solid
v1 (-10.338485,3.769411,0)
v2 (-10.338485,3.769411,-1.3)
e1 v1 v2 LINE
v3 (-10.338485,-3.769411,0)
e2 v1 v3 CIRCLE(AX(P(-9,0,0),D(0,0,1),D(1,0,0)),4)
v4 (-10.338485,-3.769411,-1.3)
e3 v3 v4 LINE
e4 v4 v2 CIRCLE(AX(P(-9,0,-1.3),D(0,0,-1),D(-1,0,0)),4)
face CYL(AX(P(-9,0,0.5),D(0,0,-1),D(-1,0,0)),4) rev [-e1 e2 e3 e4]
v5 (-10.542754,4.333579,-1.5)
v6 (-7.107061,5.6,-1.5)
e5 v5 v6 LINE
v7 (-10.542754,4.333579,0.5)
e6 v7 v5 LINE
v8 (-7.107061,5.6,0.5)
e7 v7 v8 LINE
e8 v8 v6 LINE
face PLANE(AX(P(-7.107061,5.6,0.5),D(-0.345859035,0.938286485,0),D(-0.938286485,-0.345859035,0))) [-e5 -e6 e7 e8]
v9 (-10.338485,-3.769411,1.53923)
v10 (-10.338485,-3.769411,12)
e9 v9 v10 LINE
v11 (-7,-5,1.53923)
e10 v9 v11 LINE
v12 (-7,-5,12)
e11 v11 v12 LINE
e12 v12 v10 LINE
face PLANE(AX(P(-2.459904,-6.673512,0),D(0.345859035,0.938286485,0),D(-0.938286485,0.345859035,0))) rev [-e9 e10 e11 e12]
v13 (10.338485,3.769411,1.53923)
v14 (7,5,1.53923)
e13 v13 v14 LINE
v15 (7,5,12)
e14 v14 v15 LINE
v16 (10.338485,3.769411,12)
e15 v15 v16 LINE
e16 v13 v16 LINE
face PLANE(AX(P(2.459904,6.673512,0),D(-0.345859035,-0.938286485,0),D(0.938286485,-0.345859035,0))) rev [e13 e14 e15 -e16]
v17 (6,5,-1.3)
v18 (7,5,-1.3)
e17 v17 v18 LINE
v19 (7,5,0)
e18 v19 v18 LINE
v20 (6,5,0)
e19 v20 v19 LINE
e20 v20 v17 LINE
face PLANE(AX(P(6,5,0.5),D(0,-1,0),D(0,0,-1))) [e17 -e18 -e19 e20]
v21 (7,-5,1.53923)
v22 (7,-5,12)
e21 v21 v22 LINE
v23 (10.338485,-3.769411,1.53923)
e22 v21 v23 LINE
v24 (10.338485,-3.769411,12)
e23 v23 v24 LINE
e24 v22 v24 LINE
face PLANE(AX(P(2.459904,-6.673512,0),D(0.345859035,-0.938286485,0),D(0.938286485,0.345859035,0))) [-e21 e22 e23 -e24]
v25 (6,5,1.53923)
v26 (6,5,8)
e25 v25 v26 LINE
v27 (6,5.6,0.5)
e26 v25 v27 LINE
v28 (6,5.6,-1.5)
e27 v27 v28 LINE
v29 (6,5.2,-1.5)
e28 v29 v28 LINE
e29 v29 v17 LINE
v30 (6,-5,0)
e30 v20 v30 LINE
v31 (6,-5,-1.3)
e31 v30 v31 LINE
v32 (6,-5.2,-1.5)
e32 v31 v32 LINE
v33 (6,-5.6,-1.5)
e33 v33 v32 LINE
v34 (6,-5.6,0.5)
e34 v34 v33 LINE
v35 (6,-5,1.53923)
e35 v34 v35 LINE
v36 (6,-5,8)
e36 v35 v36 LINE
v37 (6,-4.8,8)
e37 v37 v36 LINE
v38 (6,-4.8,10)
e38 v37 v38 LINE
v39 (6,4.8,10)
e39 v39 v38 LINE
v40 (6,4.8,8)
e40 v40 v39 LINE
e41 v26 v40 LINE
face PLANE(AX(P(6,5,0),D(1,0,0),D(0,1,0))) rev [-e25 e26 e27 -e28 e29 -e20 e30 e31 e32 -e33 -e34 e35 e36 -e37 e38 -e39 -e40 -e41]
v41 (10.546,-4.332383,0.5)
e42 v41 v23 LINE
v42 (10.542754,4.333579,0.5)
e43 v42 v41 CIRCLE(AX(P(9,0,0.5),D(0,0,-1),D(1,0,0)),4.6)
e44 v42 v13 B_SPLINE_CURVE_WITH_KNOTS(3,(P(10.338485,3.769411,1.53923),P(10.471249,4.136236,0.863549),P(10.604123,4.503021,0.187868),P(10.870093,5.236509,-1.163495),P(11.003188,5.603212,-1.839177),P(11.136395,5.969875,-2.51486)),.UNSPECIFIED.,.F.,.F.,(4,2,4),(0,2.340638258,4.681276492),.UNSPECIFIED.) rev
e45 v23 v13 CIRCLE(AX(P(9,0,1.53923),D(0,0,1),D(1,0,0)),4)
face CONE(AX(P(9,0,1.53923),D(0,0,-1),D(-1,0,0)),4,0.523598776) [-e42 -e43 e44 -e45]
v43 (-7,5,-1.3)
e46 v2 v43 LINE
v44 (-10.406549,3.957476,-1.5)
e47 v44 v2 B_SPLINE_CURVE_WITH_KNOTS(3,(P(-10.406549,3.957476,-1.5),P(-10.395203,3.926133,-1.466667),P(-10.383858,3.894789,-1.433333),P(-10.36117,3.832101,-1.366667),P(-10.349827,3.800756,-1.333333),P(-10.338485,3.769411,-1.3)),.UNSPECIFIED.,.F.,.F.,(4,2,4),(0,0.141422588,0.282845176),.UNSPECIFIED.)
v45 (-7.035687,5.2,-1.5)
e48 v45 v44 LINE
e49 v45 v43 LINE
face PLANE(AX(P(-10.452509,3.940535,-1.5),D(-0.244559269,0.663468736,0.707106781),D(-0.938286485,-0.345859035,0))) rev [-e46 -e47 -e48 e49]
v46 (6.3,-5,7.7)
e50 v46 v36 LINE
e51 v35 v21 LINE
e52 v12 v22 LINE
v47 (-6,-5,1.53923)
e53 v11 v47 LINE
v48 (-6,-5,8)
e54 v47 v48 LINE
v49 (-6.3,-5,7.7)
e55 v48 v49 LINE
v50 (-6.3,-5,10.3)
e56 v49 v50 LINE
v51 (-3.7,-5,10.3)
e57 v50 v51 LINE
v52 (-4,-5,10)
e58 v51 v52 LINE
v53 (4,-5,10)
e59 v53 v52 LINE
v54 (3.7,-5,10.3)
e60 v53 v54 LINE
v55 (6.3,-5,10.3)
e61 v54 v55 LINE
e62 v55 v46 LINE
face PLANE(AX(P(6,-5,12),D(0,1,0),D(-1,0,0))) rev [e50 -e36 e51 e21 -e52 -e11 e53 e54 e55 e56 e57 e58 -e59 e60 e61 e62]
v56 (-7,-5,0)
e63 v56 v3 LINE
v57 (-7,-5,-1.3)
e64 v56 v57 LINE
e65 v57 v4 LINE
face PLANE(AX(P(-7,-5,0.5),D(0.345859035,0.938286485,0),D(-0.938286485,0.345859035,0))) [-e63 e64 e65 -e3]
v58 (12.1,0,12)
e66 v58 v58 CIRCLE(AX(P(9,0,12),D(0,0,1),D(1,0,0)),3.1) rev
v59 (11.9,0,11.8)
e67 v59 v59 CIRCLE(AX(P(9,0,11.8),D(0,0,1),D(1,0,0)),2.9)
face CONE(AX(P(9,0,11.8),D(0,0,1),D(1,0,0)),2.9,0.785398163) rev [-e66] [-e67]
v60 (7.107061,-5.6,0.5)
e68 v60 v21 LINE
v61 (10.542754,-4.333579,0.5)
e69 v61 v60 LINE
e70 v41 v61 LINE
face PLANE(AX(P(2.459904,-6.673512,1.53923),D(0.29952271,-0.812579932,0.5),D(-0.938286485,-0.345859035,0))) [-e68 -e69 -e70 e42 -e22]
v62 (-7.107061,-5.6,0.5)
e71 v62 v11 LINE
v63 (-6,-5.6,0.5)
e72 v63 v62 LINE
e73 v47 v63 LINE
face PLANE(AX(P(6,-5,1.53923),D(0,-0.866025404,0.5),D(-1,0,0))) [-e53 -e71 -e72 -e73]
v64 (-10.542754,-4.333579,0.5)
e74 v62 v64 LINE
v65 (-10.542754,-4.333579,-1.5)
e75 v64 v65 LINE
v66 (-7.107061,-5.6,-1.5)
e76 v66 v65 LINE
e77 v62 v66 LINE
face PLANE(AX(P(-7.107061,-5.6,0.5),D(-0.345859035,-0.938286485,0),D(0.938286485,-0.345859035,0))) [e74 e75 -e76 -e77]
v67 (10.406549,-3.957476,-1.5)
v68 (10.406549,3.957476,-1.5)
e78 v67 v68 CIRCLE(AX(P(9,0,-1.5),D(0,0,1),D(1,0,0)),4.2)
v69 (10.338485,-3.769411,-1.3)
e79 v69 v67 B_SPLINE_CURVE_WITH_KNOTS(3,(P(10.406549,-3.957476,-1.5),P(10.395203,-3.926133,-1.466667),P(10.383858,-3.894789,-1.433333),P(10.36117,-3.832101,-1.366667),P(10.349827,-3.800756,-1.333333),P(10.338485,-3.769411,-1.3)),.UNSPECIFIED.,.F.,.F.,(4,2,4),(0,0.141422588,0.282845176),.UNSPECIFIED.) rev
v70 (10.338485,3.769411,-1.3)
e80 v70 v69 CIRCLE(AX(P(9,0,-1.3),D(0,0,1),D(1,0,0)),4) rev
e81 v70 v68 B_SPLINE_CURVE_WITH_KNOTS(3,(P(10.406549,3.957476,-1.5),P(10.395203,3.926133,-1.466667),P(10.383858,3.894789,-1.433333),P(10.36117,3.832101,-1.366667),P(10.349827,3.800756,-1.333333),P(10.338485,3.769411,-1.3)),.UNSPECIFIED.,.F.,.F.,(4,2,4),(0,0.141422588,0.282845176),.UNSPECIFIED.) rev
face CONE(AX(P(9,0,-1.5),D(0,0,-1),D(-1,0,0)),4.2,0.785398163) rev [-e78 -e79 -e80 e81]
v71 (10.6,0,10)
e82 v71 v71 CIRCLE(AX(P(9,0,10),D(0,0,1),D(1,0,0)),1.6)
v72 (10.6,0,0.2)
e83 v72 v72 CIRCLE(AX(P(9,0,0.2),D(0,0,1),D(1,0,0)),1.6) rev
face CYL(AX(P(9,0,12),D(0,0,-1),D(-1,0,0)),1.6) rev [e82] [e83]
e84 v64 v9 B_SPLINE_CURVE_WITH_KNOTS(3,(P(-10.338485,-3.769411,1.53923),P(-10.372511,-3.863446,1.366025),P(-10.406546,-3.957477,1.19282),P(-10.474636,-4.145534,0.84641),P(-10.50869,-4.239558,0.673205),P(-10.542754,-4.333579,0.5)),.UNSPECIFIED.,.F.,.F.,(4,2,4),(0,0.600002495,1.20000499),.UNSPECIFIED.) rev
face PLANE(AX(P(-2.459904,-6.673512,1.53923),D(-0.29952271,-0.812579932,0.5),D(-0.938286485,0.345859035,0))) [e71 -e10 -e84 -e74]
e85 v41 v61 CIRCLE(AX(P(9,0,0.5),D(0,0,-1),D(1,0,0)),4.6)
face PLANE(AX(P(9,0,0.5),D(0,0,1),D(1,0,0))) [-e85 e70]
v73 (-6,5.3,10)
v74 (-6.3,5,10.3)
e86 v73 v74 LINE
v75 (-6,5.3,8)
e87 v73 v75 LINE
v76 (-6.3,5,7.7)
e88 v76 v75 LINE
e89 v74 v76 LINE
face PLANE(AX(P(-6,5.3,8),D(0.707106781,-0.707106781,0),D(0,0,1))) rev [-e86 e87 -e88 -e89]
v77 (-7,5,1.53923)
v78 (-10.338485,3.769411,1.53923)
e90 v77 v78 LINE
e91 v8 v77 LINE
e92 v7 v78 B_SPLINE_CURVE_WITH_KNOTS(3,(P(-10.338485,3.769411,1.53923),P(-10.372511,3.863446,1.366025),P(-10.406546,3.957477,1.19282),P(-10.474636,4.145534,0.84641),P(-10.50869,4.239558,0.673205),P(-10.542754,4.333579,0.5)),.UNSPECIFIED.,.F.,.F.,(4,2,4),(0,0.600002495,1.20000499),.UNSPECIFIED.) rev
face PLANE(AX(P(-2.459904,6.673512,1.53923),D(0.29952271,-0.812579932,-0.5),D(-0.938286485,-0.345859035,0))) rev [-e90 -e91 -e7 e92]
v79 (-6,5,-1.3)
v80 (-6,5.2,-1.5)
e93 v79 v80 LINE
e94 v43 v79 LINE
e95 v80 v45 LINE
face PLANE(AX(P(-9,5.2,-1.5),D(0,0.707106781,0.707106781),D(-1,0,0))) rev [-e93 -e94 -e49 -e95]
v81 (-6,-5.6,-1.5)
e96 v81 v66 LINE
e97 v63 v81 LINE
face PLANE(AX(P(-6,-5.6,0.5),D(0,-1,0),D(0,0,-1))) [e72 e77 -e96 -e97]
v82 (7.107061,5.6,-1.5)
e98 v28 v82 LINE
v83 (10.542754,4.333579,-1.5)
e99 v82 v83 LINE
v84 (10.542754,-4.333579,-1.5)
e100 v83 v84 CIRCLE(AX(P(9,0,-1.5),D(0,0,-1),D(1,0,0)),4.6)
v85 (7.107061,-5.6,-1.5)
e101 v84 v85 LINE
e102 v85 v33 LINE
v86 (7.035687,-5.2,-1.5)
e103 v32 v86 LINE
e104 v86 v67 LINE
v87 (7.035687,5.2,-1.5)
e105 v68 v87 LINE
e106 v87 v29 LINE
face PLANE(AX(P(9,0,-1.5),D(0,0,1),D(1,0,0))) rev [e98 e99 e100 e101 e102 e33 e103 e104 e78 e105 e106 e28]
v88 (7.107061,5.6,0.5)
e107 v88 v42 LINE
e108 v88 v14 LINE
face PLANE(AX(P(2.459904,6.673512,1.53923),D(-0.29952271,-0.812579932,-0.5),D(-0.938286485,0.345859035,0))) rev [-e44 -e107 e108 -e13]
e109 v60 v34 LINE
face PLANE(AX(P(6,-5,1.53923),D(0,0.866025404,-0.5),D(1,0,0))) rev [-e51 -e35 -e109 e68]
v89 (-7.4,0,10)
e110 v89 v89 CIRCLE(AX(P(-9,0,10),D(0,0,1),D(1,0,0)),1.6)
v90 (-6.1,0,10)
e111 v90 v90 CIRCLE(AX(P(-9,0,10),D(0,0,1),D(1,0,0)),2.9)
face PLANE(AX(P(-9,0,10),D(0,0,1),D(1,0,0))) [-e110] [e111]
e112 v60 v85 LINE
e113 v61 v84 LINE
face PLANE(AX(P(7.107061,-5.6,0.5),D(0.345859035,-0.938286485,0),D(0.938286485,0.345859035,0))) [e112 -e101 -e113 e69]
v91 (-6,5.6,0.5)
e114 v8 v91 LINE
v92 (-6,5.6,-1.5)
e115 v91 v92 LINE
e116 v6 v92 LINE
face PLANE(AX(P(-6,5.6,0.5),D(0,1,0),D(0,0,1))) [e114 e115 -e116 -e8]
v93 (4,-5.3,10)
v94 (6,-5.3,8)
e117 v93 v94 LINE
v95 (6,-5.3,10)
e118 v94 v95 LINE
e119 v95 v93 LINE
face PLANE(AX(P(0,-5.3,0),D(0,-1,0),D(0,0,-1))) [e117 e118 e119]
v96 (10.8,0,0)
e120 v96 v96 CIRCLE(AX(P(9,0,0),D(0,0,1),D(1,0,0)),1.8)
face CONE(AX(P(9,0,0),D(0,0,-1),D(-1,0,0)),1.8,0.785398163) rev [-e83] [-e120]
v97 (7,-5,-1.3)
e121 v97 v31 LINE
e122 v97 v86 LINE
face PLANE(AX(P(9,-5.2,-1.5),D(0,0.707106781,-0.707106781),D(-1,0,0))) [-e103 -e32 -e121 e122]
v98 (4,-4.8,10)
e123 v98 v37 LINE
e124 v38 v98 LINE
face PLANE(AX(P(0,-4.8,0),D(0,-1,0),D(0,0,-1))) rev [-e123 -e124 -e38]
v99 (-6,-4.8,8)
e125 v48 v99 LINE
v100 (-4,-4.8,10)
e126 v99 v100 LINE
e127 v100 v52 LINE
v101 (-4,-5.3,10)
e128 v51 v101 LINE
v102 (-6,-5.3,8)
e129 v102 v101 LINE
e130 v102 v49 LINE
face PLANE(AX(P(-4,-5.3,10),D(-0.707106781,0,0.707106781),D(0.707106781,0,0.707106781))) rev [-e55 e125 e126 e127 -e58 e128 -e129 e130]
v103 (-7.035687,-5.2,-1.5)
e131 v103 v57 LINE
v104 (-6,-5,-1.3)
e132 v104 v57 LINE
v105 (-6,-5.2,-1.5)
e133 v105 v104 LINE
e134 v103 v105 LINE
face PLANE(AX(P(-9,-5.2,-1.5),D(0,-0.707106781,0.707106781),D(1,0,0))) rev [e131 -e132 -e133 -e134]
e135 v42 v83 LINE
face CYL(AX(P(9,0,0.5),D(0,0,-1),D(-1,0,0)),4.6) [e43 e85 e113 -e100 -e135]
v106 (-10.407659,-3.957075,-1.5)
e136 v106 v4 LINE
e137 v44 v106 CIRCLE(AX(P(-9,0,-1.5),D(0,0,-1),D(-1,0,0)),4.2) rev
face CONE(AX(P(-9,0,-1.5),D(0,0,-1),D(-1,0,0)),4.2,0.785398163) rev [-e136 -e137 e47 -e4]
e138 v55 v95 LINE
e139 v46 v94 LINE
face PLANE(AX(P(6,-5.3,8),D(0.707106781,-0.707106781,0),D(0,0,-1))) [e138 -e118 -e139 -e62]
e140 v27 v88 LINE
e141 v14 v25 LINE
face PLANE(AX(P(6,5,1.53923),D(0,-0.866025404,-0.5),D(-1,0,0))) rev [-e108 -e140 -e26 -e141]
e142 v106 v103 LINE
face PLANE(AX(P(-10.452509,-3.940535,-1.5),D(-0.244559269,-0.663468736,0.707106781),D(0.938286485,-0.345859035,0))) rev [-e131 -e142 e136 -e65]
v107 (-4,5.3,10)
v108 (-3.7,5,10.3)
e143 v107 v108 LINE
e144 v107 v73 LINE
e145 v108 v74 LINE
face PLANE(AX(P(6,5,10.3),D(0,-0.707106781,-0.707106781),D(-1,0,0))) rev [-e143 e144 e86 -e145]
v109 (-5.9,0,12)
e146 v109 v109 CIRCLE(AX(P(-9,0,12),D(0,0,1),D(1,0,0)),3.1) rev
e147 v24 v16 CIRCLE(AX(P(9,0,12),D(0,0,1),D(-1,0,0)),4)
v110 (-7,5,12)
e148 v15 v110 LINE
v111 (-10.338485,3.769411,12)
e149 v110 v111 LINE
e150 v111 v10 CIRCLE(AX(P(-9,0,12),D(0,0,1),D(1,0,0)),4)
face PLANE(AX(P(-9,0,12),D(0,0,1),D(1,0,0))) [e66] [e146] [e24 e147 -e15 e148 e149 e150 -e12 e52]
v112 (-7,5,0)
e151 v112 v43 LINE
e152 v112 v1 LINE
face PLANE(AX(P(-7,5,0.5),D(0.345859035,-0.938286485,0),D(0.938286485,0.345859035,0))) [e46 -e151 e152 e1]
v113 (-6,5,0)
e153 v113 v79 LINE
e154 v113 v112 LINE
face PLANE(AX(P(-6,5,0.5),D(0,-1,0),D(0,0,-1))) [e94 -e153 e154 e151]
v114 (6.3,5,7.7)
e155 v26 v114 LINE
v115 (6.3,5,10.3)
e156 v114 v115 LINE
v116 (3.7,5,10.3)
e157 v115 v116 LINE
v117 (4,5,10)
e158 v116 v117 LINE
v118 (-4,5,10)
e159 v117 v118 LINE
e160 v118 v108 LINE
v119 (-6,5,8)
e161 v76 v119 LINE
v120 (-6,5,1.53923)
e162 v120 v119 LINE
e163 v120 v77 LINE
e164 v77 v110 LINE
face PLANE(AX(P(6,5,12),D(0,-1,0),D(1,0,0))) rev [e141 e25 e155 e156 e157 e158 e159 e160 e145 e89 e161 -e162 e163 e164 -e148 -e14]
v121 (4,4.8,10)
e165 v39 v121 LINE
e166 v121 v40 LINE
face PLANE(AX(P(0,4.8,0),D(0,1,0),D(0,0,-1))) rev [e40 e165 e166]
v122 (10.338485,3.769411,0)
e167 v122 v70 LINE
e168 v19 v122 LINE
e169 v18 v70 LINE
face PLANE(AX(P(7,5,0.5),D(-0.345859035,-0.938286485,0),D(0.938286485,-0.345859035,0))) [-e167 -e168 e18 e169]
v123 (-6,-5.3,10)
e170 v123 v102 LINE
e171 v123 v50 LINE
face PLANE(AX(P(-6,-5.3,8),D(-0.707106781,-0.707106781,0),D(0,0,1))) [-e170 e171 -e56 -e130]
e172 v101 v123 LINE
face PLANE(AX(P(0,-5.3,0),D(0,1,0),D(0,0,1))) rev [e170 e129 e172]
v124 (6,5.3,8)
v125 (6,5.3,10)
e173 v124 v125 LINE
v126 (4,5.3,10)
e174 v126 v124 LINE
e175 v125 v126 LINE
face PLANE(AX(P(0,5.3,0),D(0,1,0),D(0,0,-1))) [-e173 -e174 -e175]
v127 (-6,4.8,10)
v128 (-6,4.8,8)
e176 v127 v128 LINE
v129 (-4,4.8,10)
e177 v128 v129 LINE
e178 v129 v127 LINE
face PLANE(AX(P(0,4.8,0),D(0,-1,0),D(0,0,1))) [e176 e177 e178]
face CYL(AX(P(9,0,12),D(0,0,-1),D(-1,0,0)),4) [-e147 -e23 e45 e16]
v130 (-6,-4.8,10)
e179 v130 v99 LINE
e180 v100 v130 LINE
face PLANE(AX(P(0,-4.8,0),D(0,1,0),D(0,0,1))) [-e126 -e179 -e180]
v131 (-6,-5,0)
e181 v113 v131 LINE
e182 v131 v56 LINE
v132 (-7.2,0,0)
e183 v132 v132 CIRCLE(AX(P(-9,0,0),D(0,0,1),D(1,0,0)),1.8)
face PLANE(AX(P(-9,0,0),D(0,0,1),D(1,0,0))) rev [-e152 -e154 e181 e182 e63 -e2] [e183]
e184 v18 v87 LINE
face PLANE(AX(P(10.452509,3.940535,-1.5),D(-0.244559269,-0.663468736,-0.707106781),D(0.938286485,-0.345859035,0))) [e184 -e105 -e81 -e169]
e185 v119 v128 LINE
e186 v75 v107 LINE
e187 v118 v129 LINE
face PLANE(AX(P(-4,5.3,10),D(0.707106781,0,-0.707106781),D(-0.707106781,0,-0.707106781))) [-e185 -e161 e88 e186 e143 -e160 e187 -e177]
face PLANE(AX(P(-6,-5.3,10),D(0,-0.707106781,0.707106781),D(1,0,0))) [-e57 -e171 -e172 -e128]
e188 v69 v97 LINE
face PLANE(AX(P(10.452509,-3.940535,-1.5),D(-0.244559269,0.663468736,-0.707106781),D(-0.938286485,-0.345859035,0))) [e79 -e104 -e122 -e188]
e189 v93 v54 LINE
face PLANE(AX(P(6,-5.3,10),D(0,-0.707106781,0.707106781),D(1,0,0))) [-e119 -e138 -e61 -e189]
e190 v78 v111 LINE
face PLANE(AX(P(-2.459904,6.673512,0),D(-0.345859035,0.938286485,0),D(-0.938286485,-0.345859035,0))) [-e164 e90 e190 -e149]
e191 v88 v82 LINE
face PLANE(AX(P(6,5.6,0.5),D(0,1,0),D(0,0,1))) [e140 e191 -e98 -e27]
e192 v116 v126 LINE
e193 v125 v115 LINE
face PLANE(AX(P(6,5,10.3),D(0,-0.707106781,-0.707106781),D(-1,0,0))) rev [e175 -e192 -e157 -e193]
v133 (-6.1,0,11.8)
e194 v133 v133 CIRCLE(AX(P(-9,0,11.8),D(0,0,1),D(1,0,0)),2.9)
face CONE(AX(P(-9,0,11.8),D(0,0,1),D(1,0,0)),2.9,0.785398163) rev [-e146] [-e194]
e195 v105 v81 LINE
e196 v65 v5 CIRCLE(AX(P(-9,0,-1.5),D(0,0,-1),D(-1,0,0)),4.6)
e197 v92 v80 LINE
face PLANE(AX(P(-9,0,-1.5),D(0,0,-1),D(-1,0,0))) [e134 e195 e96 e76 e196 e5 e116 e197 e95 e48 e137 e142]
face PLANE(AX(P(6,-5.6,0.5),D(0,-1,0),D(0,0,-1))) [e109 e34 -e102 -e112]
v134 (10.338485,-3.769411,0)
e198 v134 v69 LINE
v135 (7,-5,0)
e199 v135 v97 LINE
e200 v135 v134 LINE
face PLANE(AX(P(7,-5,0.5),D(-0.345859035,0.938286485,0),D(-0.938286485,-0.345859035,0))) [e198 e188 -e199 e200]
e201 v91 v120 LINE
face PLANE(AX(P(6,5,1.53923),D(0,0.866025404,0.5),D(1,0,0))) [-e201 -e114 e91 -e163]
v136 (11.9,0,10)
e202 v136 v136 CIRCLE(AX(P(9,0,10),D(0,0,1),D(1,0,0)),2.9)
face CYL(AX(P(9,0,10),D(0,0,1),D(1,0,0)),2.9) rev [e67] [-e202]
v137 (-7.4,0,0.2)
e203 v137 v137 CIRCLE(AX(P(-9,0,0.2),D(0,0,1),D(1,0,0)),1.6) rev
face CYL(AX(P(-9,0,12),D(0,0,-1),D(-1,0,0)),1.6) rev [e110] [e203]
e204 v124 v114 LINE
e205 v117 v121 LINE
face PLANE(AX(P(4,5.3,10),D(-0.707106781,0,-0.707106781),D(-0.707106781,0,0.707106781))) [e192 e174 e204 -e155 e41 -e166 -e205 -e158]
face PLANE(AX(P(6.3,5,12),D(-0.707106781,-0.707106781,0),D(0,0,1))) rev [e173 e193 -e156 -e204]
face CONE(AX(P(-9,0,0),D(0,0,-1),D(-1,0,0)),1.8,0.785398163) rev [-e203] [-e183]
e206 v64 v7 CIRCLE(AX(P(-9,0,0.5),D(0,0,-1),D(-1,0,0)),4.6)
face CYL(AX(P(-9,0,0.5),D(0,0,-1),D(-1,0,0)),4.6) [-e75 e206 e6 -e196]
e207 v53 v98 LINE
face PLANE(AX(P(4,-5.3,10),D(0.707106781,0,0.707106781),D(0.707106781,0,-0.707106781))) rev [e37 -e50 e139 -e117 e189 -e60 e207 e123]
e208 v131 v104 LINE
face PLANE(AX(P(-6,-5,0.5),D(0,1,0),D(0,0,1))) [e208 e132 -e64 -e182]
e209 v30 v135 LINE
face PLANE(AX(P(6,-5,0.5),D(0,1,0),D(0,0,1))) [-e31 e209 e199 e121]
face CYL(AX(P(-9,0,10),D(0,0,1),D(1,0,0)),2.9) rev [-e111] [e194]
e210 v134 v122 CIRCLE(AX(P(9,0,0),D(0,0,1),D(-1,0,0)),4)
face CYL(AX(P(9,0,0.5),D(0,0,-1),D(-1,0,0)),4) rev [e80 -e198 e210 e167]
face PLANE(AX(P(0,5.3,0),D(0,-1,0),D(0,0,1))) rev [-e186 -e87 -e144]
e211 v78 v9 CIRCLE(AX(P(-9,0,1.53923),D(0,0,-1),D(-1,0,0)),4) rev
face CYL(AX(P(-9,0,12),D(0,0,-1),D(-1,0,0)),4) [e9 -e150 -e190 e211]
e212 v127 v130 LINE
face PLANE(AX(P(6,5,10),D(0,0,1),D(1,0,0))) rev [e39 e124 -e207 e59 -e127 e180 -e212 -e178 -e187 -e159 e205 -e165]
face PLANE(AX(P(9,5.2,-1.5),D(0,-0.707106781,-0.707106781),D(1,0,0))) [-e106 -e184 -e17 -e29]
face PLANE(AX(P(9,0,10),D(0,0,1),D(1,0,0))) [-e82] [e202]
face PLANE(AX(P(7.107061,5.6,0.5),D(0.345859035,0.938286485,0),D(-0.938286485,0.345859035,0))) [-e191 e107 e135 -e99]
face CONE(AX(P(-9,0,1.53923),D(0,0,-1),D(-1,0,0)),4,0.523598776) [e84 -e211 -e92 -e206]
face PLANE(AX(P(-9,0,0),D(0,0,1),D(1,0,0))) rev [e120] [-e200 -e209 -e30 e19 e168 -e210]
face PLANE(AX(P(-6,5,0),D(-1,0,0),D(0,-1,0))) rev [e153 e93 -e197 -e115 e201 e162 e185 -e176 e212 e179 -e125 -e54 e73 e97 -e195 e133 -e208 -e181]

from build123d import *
from OCP.BRepFilletAPI import BRepFilletAPI_MakeChamfer

# Parameters (mm, degrees)
SKIZZE2_R                            = 1.6
AUFSATZ_LINEAR_AUSTRAGEN1_DEPTH      = 12
SCHNITT_LINEAR_AUSTRAGEN1_DEPTH      = 19.384776311
SCHNITT_LINEAR_AUSTRAGEN1_DEPTH_BACK = 19.384776311
SKIZZE3_W                            = 12
SKIZZE3_H                            = 10
AUFSATZ_LINEAR_AUSTRAGEN2_DEPTH      = 12
AUFSATZ_LINEAR_START                 = -0.2
AUFSATZ_LINEAR_AUSTRAGEN3_DEPTH      = 0.5
FASE3_SIZE                           = 0.3
AUFSATZ_LINEAR_AUSTRAGEN4_DEPTH      = 2
FASE1_SIZE                           = 0.6
FASE1_SIZE_2                         = 1.039230485
SKIZZE7_R                            = 2.9
SCHNITT_LINEAR_AUSTRAGEN2_DEPTH      = 2
FASE2_SIZE                           = 0.2


with BuildPart() as part:
    # Skizze2 → Aufsatz-Linear austragen1 (new body)
    with BuildSketch(Plane.XY):
        with BuildLine():
            Line((-6, -2.645751311), (-6, -5))
            Line((-6, -5), (6, -5))
            Line((6, -5), (6, -2.645751311))
            ThreePointArc((6, -2.645751311), (13, 0), (6, 2.645751311))
            Line((6, 2.645751311), (6, 5))
            Line((6, 5), (-6, 5))
            Line((-6, 5), (-6, 2.645751311))
            ThreePointArc((-6, 2.645751311), (-13, 0), (-6, -2.645751311))
        make_face()
        with Locations((-9, 0)):
            Circle(SKIZZE2_R, mode=Mode.SUBTRACT)
        with Locations(Location((9, 0, 0), (0, 0, 180))):
            Circle(SKIZZE2_R, mode=Mode.SUBTRACT)
    extrude(amount=AUFSATZ_LINEAR_AUSTRAGEN1_DEPTH)

    # Skizze3 → Schnitt-Linear austragen1 (cut, two sides: drawn at the far end of the back side and taken through both)
    with BuildSketch(Plane(origin=(0, 0, 0), x_dir=(-1, 0, 0), z_dir=(0, -1, 0)).offset(-SCHNITT_LINEAR_AUSTRAGEN1_DEPTH_BACK)):
        with Locations((0, -5)):
            Rectangle(SKIZZE3_W, SKIZZE3_H)
    extrude(amount=SCHNITT_LINEAR_AUSTRAGEN1_DEPTH + SCHNITT_LINEAR_AUSTRAGEN1_DEPTH_BACK, mode=Mode.SUBTRACT)

    # Skizze4 → Aufsatz-Linear austragen2 (add, through all)
    with BuildSketch(Plane.XY.offset(12)):
        with BuildLine():
            Line((-6, 2.645751311), (-6, 5))
            Line((-6, 5), (-7, 5))
            Line((-7, 5), (-10.338485005, 3.769410815))
            ThreePointArc((-10.338485005, 3.769410815), (-7.997098863, 3.872233117), (-6, 2.645751311))
        make_face()
        with BuildLine():
            ThreePointArc((-6, -2.645751311), (-7.997098863, -3.872233117), (-10.338485005, -3.769410815))
            Line((-10.338485005, -3.769410815), (-7, -5))
            Line((-7, -5), (-6, -5))
            Line((-6, -5), (-6, -2.645751311))
        make_face()
        with BuildLine():
            ThreePointArc((6, 2.645751311), (7.997098863, 3.872233117), (10.338485005, 3.769410815))
            Line((10.338485005, 3.769410815), (7, 5))
            Line((7, 5), (6, 5))
            Line((6, 5), (6, 2.645751311))
        make_face()
        with BuildLine():
            Line((6, -2.645751311), (6, -5))
            Line((6, -5), (7, -5))
            Line((7, -5), (10.338485005, -3.769410815))
            ThreePointArc((10.338485005, -3.769410815), (7.997098863, -3.872233117), (6, -2.645751311))
        make_face()
    extrude(amount=-AUFSATZ_LINEAR_AUSTRAGEN2_DEPTH)

    # Skizze5 → Aufsatz-Linear austragen3 (add)
    with BuildSketch(Plane.XZ.offset(5).offset(AUFSATZ_LINEAR_START)):
        Polygon((-6, 10), (-4, 10), (-6, 8), align=None)
        Polygon((6, 8), (6, 10), (4, 10), align=None)
    aufsatz_linear_austragen3 = extrude(amount=AUFSATZ_LINEAR_AUSTRAGEN3_DEPTH)

    # Spiegeln1: Aufsatz-Linear austragen3 across plane
    add(aufsatz_linear_austragen3.mirror(Plane(origin=(0, 0, 0), x_dir=(0, 0, 1), z_dir=(0, -1, 0))))

    # Fase3
    fase3_edges = [part.edges().sort_by_distance(p)[0] for p in [
        (6, -5, 9),
        (5, -5, 10),
        (-6, -5, 9),
        (-5, -5, 10),
        (6, 5, 9),
        (5, 5, 10),
        (-5, 5, 10),
        (-6, 5, 9),
    ]]
    chamfer(fase3_edges, length=FASE3_SIZE - 0.0001)  # a hair under: the kernel refuses the full size

    # Skizze6 → Aufsatz-Linear austragen4 (add)
    with BuildSketch(Plane(origin=(0, 0, -1.5), x_dir=(-1, 0, 0), z_dir=(0, 0, -1))):
        with BuildLine():
            Line((6, -5), (7, -5))
            Line((7, -5), (10.338485005, -3.769410815))
            ThreePointArc((10.338485005, -3.769410815), (13, 0), (10.338485005, 3.769410815))
            Line((10.338485005, 3.769410815), (7, 5))
            Line((7, 5), (6, 5))
            Line((6, 5), (6, 5.6))
            Line((6, 5.6), (7.107061274, 5.6))
            Line((7.107061274, 5.6), (10.542753877, 4.333579407))
            ThreePointArc((10.542753877, 4.333579407), (13.6, 0), (10.542753877, -4.333579407))
            Line((10.542753877, -4.333579407), (7.107061274, -5.6))
            Line((7.107061274, -5.6), (6, -5.6))
            Line((6, -5.6), (6, -5))
        make_face()
        with BuildLine():
            Line((-6, -5), (-6, -5.6))
            Line((-6, -5.6), (-7.107061274, -5.6))
            Line((-7.107061274, -5.6), (-10.542753877, -4.333579407))
            ThreePointArc((-10.542753877, -4.333579407), (-13.6, 0), (-10.542753877, 4.333579407))
            Line((-10.542753877, 4.333579407), (-7.107061274, 5.6))
            Line((-7.107061274, 5.6), (-6, 5.6))
            Line((-6, 5.6), (-6, 5))
            Line((-6, 5), (-7, 5))
            Line((-7, 5), (-10.338485005, 3.769410815))
            ThreePointArc((-10.338485005, 3.769410815), (-13, 0), (-10.338485005, -3.769410815))
            Line((-10.338485005, -3.769410815), (-7, -5))
            Line((-7, -5), (-6, -5))
        make_face()
    extrude(amount=-AUFSATZ_LINEAR_AUSTRAGEN4_DEPTH)

    # Fase1
    fase1_edges_1 = [part.edges().sort_by_distance(p)[0] for p in [
        (-6.5, -5, 0.5),
    ]]
    fase1_side_1 = [part.faces().sort_by_distance(p)[0] for p in [
        (-6.5, -5.012, 0.5),
    ]]
    fase1_edges_2 = [part.edges().sort_by_distance(p)[0] for p in [
        (-8.669242502, -4.384705408, 0.5),
    ]]
    fase1_side_2 = [part.faces().sort_by_distance(p)[0] for p in [
        (-8.673392811, -4.395964845, 0.5),
    ]]
    fase1_edges_3 = [part.edges().sort_by_distance(p)[0] for p in [
        (-8.669242502, 4.384705408, 0.5),
    ]]
    fase1_side_3 = [part.faces().sort_by_distance(p)[0] for p in [
        (-8.673392811, 4.395964845, 0.5),
    ]]
    fase1_edges_4 = [part.edges().sort_by_distance(p)[0] for p in [
        (-6.5, 5, 0.5),
    ]]
    fase1_side_4 = [part.faces().sort_by_distance(p)[0] for p in [
        (-6.5, 5, 0.512),
    ]]
    fase1_edges_5 = [part.edges().sort_by_distance(p)[0] for p in [
        (6.5, 5, 0.5),
    ]]
    fase1_side_5 = [part.faces().sort_by_distance(p)[0] for p in [
        (6.5, 5, 0.512),
    ]]
    fase1_edges_6 = [part.edges().sort_by_distance(p)[0] for p in [
        (8.669242502, 4.384705408, 0.5),
    ]]
    fase1_side_6 = [part.faces().sort_by_distance(p)[0] for p in [
        (8.669242502, 4.384705408, 0.512),
    ]]
    fase1_edges_7 = [part.edges().sort_by_distance(p)[0] for p in [
        (8.669242502, -4.384705408, 0.5),
    ]]
    fase1_side_7 = [part.faces().sort_by_distance(p)[0] for p in [
        (8.673392811, -4.395964845, 0.5),
    ]]
    fase1_edges_8 = [part.edges().sort_by_distance(p)[0] for p in [
        (6.5, -5, 0.5),
    ]]
    fase1_side_8 = [part.faces().sort_by_distance(p)[0] for p in [
        (6.5, -5.012, 0.5),
    ]]
    fase1 = BRepFilletAPI_MakeChamfer(part.part.solid().wrapped)
    for e in fase1_edges_1:
        fase1.Add(FASE1_SIZE - 0.0001, FASE1_SIZE_2 - 0.0001, e.wrapped, fase1_side_1[0].wrapped)
    for e in fase1_edges_2:
        fase1.Add(FASE1_SIZE - 0.0001, FASE1_SIZE_2 - 0.0001, e.wrapped, fase1_side_2[0].wrapped)
    for e in fase1_edges_3:
        fase1.Add(FASE1_SIZE - 0.0001, FASE1_SIZE_2 - 0.0001, e.wrapped, fase1_side_3[0].wrapped)
    for e in fase1_edges_4:
        fase1.Add(FASE1_SIZE_2 - 0.0001, FASE1_SIZE - 0.0001, e.wrapped, fase1_side_4[0].wrapped)
    for e in fase1_edges_5:
        fase1.Add(FASE1_SIZE_2 - 0.0001, FASE1_SIZE - 0.0001, e.wrapped, fase1_side_5[0].wrapped)
    for e in fase1_edges_6:
        fase1.Add(FASE1_SIZE_2 - 0.0001, FASE1_SIZE - 0.0001, e.wrapped, fase1_side_6[0].wrapped)
    for e in fase1_edges_7:
        fase1.Add(FASE1_SIZE - 0.0001, FASE1_SIZE_2 - 0.0001, e.wrapped, fase1_side_7[0].wrapped)
    for e in fase1_edges_8:
        fase1.Add(FASE1_SIZE - 0.0001, FASE1_SIZE_2 - 0.0001, e.wrapped, fase1_side_8[0].wrapped)
    add(Compound.cast(fase1.Shape()), mode=Mode.REPLACE)  # a hair under: the kernel refuses the full size

    # Skizze7 → Schnitt-Linear austragen2 (cut)
    with BuildSketch(Plane.XY.offset(12)):
        with Locations((-9, 0)):
            Circle(SKIZZE7_R)
        with Locations((9, 0)):
            Circle(SKIZZE7_R)
    extrude(amount=-SCHNITT_LINEAR_AUSTRAGEN2_DEPTH, mode=Mode.SUBTRACT)

    # Fase2
    fase2_edges = [part.edges().sort_by_distance(p)[0] for p in [
        (-6.5, -5, -1.5),
        (-8.669242502, -4.384705408, -1.5),
        (-8.669242502, 4.384705408, -1.5),
        (-6.5, 5, -1.5),
        (6.5, -5, -1.5),
        (8.669242502, -4.384705408, -1.5),
        (13, 0, -1.5),
        (8.669242502, 4.384705408, -1.5),
        (6.5, 5, -1.5),
        (10.6, 0, 0),
        (-10.6, 0, 0),
        (-11.9, 0, 12),
        (6.1, 0, 12),
    ]]
    chamfer(fase2_edges, length=FASE2_SIZE)


solid = part.part
